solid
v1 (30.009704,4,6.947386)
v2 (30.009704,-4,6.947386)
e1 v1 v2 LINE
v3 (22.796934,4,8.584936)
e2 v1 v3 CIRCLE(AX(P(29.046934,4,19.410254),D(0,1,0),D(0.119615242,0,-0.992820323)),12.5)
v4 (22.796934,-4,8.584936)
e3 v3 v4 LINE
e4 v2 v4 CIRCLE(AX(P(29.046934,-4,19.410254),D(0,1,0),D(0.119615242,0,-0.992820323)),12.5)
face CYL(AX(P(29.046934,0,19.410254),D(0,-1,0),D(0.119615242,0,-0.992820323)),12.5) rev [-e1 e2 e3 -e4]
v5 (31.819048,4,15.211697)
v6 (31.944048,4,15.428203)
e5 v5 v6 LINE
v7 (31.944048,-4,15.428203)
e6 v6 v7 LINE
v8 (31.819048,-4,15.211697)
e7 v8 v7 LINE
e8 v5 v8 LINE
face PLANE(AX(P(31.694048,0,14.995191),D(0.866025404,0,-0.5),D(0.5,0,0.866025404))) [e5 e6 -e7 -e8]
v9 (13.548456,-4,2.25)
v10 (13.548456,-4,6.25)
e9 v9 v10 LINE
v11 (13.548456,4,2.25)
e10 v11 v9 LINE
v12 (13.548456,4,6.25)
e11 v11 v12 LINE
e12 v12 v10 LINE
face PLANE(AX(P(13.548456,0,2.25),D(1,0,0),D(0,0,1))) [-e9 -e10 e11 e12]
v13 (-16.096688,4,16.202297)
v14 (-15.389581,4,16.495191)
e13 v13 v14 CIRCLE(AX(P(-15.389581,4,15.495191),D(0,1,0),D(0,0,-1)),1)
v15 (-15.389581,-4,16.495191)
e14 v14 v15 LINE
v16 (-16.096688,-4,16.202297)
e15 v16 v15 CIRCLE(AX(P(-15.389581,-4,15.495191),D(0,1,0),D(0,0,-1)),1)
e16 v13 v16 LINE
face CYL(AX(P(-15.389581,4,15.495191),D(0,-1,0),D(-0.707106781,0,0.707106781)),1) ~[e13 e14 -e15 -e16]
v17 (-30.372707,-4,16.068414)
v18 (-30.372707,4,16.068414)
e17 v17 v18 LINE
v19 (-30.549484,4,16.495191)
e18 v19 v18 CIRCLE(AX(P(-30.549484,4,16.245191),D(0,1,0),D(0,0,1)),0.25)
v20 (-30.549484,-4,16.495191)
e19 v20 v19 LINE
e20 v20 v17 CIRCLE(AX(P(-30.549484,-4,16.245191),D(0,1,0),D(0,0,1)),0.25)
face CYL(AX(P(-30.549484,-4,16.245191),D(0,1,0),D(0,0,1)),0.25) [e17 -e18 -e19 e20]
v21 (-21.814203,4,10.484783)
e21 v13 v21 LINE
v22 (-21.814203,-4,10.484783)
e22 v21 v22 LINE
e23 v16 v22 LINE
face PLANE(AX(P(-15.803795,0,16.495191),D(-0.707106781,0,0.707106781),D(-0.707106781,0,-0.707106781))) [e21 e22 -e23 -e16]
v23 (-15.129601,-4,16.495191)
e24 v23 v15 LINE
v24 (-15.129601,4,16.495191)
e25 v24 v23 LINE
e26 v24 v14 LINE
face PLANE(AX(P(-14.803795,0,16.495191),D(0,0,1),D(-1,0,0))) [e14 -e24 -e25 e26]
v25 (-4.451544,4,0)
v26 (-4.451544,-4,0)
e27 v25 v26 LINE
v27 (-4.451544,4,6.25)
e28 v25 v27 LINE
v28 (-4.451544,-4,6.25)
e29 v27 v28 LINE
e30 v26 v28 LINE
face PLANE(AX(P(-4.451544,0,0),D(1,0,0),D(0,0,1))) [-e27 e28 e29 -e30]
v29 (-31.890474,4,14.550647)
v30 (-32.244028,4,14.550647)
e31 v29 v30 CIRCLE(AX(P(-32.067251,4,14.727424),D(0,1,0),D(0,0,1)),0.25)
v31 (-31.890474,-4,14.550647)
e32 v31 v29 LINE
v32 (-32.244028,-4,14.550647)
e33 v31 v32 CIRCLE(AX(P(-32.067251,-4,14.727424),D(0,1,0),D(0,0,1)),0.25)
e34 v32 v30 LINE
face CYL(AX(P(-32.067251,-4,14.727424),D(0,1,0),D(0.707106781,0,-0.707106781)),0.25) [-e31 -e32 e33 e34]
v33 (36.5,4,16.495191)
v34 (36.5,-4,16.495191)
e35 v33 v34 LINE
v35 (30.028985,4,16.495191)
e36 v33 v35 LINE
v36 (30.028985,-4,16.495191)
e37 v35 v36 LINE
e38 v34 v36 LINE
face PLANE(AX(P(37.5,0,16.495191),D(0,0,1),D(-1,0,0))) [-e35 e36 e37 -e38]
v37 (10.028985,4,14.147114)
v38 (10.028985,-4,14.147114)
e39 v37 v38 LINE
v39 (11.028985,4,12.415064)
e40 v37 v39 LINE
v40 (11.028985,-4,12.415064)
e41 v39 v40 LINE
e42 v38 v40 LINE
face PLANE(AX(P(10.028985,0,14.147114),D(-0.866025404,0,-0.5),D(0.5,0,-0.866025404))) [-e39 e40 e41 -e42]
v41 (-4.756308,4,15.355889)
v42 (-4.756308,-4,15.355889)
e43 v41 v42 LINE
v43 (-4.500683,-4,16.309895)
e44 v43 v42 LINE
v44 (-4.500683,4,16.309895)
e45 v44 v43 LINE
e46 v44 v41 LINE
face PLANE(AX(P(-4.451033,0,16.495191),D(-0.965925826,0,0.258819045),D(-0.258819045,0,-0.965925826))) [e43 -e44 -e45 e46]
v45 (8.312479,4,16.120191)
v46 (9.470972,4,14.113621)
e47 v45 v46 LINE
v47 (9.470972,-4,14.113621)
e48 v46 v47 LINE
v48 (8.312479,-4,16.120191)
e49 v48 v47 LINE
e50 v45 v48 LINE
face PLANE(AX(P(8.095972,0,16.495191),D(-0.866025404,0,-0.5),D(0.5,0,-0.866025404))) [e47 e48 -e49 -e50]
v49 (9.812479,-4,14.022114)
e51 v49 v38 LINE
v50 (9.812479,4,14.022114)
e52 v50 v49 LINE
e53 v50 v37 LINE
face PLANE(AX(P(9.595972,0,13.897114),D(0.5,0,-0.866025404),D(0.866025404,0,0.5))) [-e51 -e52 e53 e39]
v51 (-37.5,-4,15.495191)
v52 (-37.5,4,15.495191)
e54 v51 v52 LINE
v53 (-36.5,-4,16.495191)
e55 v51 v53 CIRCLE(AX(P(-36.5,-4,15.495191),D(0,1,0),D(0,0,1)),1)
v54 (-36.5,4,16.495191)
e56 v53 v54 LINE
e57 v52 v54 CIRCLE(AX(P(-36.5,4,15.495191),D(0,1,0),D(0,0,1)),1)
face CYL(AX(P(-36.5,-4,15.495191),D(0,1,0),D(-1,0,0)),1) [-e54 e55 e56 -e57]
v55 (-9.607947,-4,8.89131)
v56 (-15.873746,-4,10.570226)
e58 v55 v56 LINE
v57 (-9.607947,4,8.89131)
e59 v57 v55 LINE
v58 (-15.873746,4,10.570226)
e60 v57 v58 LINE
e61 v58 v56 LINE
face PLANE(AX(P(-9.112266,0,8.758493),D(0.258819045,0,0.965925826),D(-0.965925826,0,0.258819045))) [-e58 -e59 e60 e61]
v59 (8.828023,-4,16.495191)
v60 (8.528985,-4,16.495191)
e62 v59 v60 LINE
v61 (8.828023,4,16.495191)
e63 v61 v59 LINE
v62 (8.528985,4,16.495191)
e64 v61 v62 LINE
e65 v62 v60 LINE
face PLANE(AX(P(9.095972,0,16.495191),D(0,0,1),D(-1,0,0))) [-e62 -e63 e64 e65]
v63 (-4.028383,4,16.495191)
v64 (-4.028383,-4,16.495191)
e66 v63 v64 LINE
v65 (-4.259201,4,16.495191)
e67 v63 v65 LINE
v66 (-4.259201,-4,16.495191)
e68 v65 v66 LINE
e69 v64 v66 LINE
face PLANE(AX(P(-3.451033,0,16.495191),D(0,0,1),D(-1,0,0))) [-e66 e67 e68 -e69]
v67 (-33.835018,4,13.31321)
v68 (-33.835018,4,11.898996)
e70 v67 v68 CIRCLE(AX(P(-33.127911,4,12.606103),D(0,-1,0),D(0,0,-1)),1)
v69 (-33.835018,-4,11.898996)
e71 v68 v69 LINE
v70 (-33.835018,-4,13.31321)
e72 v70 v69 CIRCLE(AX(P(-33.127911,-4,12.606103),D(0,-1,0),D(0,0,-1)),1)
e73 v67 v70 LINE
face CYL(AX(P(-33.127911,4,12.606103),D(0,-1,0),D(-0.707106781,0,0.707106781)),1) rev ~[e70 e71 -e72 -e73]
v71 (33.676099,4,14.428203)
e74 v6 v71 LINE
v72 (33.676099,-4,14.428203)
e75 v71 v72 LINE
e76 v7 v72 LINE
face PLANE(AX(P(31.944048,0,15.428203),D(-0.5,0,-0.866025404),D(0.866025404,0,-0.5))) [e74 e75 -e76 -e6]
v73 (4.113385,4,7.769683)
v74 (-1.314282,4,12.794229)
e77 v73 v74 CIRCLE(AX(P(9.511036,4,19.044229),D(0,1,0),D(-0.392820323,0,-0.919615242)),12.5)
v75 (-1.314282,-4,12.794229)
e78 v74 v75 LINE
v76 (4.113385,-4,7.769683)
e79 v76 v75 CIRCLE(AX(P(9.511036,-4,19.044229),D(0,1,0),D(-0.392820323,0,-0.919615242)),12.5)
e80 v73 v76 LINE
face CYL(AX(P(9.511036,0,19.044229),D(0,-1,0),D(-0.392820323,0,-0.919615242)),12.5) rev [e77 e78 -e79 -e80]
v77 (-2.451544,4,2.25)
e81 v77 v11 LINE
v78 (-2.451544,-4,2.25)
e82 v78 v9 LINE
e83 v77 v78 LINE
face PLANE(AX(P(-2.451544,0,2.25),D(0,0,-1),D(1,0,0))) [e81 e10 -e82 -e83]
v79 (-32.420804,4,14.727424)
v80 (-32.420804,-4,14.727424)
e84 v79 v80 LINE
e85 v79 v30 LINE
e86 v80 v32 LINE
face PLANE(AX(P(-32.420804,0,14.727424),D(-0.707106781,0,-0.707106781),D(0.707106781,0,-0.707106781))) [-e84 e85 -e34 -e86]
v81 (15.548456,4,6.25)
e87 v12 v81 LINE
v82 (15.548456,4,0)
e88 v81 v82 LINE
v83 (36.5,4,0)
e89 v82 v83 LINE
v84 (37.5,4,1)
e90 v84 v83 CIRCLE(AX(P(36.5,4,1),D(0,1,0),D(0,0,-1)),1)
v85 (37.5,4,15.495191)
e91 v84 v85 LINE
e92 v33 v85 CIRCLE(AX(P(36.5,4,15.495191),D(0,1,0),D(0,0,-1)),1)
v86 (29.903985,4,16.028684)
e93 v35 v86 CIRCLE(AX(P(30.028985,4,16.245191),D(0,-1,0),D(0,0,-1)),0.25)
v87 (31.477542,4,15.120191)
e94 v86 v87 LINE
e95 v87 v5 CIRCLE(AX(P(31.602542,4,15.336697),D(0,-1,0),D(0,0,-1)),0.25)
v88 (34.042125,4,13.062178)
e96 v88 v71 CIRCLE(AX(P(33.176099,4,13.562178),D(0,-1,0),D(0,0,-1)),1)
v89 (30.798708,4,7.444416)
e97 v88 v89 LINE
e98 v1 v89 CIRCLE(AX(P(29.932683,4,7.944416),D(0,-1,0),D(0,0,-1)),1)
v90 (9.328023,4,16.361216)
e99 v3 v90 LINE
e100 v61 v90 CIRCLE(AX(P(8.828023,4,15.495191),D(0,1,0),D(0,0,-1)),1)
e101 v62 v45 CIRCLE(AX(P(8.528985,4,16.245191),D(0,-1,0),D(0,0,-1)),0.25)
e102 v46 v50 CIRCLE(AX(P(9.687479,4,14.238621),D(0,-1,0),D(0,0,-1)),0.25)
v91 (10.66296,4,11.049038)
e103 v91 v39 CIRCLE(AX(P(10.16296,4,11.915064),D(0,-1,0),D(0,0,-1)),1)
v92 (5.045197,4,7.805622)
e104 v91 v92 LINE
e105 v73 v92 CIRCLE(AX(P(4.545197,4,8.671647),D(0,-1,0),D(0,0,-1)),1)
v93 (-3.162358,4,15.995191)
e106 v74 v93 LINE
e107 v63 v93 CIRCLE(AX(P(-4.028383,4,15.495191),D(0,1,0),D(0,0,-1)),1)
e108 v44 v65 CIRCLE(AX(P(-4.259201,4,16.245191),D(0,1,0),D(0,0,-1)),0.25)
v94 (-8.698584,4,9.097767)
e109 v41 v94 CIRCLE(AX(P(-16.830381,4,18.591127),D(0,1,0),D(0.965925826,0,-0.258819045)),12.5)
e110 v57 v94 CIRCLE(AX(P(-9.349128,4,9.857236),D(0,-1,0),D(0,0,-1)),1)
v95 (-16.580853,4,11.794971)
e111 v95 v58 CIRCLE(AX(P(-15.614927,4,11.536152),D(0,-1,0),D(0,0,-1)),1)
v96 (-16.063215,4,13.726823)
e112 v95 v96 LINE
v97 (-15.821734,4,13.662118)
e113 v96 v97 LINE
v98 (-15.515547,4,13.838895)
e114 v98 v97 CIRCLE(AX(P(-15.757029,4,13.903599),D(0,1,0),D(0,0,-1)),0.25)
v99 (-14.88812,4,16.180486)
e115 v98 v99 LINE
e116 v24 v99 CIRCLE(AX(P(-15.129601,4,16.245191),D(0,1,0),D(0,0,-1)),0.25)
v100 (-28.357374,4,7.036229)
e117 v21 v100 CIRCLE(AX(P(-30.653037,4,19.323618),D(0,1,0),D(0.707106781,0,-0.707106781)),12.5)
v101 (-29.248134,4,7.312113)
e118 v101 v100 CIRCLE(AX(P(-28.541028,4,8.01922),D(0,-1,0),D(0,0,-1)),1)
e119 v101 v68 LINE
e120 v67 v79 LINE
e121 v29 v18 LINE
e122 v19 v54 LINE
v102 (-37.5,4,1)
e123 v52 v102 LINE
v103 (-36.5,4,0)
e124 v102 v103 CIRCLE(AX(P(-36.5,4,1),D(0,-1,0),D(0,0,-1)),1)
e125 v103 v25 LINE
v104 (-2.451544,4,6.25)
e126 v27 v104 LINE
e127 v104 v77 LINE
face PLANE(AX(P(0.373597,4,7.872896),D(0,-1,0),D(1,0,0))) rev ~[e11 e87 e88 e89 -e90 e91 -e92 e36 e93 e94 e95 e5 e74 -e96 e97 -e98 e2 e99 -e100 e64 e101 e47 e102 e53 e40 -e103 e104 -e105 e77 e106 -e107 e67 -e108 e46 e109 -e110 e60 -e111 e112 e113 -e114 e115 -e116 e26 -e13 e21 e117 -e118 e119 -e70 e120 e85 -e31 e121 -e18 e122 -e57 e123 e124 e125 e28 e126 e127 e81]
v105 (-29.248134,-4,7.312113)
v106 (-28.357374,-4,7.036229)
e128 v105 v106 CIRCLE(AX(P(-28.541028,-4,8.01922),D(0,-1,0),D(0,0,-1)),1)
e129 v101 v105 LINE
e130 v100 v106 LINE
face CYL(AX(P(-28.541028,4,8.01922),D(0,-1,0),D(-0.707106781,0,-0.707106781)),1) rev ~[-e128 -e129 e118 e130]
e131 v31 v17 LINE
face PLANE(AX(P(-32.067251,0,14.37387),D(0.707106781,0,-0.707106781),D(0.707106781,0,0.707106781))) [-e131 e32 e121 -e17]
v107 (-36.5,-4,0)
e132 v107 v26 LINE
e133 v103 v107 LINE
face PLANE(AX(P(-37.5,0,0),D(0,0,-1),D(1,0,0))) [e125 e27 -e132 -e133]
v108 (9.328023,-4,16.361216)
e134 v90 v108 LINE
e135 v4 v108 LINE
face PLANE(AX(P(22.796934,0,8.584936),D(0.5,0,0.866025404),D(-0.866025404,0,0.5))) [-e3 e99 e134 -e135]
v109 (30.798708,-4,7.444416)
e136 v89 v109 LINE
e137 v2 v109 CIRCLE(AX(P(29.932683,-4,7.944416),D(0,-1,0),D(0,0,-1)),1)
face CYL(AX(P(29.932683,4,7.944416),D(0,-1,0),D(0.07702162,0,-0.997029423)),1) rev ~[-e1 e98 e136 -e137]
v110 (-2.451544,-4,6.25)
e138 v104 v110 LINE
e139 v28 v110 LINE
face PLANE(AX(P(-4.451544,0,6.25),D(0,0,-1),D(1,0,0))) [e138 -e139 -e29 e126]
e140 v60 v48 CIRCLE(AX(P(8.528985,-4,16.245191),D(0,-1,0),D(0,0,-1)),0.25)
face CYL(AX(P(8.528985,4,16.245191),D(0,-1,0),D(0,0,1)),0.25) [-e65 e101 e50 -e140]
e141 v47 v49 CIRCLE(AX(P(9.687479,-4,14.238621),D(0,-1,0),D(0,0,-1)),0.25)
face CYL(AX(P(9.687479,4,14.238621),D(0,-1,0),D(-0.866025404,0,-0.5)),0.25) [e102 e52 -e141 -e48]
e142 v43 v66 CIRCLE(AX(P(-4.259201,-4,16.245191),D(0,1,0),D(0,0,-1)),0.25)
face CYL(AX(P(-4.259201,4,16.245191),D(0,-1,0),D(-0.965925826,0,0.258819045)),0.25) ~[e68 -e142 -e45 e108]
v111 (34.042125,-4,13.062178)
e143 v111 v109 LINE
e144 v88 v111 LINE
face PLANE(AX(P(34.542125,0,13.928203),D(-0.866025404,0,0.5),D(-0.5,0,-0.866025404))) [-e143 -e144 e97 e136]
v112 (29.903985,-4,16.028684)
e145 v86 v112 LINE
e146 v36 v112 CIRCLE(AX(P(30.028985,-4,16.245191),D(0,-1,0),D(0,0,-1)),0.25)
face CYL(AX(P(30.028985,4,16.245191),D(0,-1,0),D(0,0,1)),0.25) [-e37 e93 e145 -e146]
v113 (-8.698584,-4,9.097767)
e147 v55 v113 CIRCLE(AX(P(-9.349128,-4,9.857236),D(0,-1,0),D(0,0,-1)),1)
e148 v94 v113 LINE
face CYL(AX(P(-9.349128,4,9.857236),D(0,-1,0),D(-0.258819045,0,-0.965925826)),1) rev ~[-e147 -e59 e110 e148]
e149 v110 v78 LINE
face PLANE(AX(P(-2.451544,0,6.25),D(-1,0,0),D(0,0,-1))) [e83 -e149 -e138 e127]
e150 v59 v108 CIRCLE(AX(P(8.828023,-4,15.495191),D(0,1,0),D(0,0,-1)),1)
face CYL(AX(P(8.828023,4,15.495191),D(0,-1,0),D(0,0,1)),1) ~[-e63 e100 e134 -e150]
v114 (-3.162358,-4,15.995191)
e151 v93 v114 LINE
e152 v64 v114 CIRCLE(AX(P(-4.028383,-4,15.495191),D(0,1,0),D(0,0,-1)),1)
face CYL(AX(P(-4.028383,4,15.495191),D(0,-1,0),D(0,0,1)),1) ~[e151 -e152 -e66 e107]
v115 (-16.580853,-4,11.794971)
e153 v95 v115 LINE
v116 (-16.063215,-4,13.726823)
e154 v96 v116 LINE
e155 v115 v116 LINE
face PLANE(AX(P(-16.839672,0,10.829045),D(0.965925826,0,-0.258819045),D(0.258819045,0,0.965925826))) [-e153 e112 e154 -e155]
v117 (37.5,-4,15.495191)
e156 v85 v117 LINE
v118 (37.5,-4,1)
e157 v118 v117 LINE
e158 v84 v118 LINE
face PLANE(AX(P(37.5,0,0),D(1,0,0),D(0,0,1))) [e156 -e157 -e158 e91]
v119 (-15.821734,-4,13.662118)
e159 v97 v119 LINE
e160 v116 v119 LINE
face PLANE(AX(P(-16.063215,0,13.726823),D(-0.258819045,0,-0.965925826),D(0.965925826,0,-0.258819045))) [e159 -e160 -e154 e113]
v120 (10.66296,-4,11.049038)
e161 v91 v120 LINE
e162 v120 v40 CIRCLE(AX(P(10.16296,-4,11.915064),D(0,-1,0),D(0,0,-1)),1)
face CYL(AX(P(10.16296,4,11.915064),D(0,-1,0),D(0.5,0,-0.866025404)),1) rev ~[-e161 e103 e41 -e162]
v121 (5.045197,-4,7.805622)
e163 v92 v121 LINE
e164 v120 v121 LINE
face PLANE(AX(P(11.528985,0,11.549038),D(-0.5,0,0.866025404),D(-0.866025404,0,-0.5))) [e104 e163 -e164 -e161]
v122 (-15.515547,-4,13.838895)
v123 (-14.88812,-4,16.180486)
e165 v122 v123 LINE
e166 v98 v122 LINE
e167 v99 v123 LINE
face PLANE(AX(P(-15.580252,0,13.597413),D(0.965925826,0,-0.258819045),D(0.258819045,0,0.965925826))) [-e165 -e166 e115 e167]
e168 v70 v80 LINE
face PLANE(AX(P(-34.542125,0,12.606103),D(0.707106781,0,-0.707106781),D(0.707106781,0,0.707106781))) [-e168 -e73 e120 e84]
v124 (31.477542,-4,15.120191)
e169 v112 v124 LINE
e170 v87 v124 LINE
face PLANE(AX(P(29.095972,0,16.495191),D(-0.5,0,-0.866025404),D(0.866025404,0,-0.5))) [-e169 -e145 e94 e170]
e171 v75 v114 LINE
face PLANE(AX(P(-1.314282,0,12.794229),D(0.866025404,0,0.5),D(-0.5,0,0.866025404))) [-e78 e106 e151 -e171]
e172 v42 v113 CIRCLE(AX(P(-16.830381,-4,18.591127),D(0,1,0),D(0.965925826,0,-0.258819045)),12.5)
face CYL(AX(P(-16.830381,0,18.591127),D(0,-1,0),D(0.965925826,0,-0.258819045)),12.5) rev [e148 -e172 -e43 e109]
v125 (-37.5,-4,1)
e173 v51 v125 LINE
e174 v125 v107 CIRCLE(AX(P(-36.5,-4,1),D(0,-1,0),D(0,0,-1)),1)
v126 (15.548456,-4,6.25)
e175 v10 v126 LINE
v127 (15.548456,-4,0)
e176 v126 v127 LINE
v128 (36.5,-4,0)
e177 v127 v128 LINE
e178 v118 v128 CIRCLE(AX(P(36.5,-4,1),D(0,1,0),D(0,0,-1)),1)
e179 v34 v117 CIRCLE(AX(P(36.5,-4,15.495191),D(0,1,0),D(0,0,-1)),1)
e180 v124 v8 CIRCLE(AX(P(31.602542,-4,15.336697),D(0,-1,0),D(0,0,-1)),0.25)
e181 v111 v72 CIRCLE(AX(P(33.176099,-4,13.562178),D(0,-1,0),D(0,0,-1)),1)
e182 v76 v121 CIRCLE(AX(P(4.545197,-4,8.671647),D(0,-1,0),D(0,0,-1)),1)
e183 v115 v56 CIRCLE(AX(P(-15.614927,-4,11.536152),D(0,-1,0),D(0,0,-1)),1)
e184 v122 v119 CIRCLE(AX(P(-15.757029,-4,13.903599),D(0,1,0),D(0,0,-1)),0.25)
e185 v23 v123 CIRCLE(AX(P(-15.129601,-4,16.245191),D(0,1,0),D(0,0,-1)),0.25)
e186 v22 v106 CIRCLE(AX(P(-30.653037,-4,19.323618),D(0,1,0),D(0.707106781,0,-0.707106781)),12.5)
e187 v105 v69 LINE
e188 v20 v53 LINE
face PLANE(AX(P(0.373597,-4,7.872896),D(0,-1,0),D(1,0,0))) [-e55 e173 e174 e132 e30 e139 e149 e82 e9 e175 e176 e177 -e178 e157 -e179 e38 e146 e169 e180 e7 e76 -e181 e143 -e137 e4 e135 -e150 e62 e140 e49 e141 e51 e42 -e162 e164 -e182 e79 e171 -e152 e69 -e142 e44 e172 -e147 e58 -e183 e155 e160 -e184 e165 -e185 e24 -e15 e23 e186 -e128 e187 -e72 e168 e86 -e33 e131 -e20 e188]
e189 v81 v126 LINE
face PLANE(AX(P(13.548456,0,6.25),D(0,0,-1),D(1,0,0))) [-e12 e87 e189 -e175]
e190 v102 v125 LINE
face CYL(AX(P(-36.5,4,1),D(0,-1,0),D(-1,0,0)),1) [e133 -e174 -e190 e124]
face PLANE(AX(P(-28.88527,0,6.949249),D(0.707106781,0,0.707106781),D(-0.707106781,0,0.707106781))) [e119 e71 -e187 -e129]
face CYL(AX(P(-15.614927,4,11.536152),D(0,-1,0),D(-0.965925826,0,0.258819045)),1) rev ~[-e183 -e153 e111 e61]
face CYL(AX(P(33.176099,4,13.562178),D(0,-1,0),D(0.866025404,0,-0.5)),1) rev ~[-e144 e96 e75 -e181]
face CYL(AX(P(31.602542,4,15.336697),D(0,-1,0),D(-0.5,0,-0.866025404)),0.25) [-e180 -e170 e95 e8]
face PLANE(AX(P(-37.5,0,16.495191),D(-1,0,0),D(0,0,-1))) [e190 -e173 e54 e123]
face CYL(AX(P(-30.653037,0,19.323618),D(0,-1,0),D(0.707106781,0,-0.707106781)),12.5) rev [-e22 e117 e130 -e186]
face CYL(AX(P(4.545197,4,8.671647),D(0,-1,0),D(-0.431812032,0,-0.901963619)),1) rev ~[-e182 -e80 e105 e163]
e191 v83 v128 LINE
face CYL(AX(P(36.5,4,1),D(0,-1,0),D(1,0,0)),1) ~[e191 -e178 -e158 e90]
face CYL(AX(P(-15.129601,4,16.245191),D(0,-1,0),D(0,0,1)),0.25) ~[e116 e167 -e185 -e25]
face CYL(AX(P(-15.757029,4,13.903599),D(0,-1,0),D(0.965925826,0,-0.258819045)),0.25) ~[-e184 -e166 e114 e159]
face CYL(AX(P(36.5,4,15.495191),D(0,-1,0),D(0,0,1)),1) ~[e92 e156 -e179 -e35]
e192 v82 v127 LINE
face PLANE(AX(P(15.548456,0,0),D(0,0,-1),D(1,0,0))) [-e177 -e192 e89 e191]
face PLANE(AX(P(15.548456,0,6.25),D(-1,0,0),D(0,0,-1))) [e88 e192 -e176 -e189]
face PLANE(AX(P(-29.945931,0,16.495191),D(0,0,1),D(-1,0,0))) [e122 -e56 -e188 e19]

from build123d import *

# Parameters (mm, degrees)
F2_DEPTH = 4
F3_R     = 1
F4_R     = 0.25


# Not quite as in the source:
# - a feature names something its author has since deleted; it is built from what else it names


with BuildPart() as f2:
    # F1 (on Front) → F2 (new body, symmetric)
    with BuildSketch(Plane.XZ):
        with BuildLine():
            Line((-37.5, 16.4951905284), (-37.5, 0))
            Line((-37.5, 0), (-4.4515441619, 0))
            Line((-4.4515441619, 0), (-4.4515441619, 6.25))
            Line((-4.4515441619, 6.25), (-2.4515441619, 6.25))
            Line((-2.4515441619, 6.25), (-2.4515441619, 2.25))
            Line((-2.4515441619, 2.25), (13.5484558381, 2.25))
            Line((13.5484558381, 2.25), (13.5484558381, 6.25))
            Line((13.5484558381, 6.25), (15.5484558381, 6.25))
            Line((15.5484558381, 6.25), (15.5484558381, 0))
            Line((15.5484558381, 0), (37.5, 0))
            Line((37.5, 0), (37.5, 16.4951905284))
            Line((37.5, 16.4951905284), (29.0959722333, 16.4951905284))
            Line((29.0959722333, 16.4951905284), (31.6940484447, 14.9951905284))
            Line((31.6940484447, 14.9951905284), (31.9440484447, 15.4282032303))
            Line((31.9440484447, 15.4282032303), (34.542124656, 13.9282032303))
            Line((34.542124656, 13.9282032303), (30.542124656, 7))
            ThreePointArc((30.542124656, 7), (26.5409294992, 7.164032547), (22.7969341276, 8.5849364905))
            Line((22.7969341276, 8.5849364905), (9.0959722333, 16.4951905284))
            Line((9.0959722333, 16.4951905284), (8.0959722333, 16.4951905284))
            Line((8.0959722333, 16.4951905284), (9.5959722333, 13.897114317))
            Line((9.5959722333, 13.897114317), (10.0289849352, 14.147114317))
            Line((10.0289849352, 14.147114317), (11.5289849352, 11.5490381057))
            Line((11.5289849352, 11.5490381057), (4.6007817049, 7.5490381057))
            ThreePointArc((4.6007817049, 7.5490381057), (1.2176613272, 9.6916920368), (-1.3142818045, 12.7942286341))
            Line((-1.3142818045, 12.7942286341), (-3.4510331505, 16.4951905284))
            Line((-3.4510331505, 16.4951905284), (-4.4510331505, 16.4951905284))
            Line((-4.4510331505, 16.4951905284), (-4.756308124, 15.3558888168))
            ThreePointArc((-4.756308124, 15.3558888168), (-6.3989818261, 11.7037534869), (-9.112265528, 8.7584927324))
            Line((-9.112265528, 8.7584927324), (-16.8396721383, 10.8290450932))
            Line((-16.8396721383, 10.8290450932), (-16.063215003, 13.7268225721))
            Line((-16.063215003, 13.7268225721), (-15.5802520899, 13.5974130495))
            Line((-15.5802520899, 13.5974130495), (-14.8037949546, 16.4951905284))
            Line((-14.8037949546, 16.4951905284), (-15.8037949546, 16.4951905284))
            Line((-15.8037949546, 16.4951905284), (-21.8142025947, 10.4847828883))
            ThreePointArc((-21.8142025947, 10.4847828883), (-25.0628674157, 8.1432777656), (-28.8852704065, 6.9492489824))
            Line((-28.8852704065, 6.9492489824), (-34.542124656, 12.6061032319))
            Line((-34.542124656, 12.6061032319), (-32.4208043125, 14.7274235754))
            Line((-32.4208043125, 14.7274235754), (-32.0672509219, 14.3738701848))
            Line((-32.0672509219, 14.3738701848), (-29.9459305783, 16.4951905284))
            Line((-29.9459305783, 16.4951905284), (-37.5, 16.4951905284))
        make_face()
    extrude(amount=F2_DEPTH, both=True)

    # F3
    f3_edges = [f2.edges().sort_by_distance(p)[0] for p in [
        (-37.5, 0, 0),
        (37.5, 0, 0),
        (37.5, 0, 16.495191),
        (9.095972, 0, 16.495191),
        (30.542125, 0, 7),
        (4.600782, 0, 7.549038),
        (34.542125, 0, 13.928203),
        (-9.112266, 0, 8.758493),
        (-28.88527, 0, 6.949249),
        (-3.451033, 0, 16.495191),
        (-1.314282, 0, 12.794229),
        (-15.803795, 0, 16.495191),
        (-37.5, 0, 16.495191),
        (11.528985, 0, 11.549038),
        (-16.839672, 0, 10.829045),
        (-34.542125, 0, 12.606103),
    ]]
    fillet(f3_edges, radius=F3_R)

    # F4
    f4_edges = [f2.edges().sort_by_distance(p)[0] for p in [
        (29.095972, 0, 16.495191),
        (-4.451033, 0, 16.495191),
        (-14.803795, 0, 16.495191),
        (-29.945931, 0, 16.495191),
        (31.694048, 0, 14.995191),
        (-15.580252, 0, 13.597413),
        (-32.067251, 0, 14.37387),
        (9.595972, 0, 13.897114),
        (8.095972, 0, 16.495191),
    ]]
    fillet(f4_edges, radius=F4_R)


solid = f2.part
